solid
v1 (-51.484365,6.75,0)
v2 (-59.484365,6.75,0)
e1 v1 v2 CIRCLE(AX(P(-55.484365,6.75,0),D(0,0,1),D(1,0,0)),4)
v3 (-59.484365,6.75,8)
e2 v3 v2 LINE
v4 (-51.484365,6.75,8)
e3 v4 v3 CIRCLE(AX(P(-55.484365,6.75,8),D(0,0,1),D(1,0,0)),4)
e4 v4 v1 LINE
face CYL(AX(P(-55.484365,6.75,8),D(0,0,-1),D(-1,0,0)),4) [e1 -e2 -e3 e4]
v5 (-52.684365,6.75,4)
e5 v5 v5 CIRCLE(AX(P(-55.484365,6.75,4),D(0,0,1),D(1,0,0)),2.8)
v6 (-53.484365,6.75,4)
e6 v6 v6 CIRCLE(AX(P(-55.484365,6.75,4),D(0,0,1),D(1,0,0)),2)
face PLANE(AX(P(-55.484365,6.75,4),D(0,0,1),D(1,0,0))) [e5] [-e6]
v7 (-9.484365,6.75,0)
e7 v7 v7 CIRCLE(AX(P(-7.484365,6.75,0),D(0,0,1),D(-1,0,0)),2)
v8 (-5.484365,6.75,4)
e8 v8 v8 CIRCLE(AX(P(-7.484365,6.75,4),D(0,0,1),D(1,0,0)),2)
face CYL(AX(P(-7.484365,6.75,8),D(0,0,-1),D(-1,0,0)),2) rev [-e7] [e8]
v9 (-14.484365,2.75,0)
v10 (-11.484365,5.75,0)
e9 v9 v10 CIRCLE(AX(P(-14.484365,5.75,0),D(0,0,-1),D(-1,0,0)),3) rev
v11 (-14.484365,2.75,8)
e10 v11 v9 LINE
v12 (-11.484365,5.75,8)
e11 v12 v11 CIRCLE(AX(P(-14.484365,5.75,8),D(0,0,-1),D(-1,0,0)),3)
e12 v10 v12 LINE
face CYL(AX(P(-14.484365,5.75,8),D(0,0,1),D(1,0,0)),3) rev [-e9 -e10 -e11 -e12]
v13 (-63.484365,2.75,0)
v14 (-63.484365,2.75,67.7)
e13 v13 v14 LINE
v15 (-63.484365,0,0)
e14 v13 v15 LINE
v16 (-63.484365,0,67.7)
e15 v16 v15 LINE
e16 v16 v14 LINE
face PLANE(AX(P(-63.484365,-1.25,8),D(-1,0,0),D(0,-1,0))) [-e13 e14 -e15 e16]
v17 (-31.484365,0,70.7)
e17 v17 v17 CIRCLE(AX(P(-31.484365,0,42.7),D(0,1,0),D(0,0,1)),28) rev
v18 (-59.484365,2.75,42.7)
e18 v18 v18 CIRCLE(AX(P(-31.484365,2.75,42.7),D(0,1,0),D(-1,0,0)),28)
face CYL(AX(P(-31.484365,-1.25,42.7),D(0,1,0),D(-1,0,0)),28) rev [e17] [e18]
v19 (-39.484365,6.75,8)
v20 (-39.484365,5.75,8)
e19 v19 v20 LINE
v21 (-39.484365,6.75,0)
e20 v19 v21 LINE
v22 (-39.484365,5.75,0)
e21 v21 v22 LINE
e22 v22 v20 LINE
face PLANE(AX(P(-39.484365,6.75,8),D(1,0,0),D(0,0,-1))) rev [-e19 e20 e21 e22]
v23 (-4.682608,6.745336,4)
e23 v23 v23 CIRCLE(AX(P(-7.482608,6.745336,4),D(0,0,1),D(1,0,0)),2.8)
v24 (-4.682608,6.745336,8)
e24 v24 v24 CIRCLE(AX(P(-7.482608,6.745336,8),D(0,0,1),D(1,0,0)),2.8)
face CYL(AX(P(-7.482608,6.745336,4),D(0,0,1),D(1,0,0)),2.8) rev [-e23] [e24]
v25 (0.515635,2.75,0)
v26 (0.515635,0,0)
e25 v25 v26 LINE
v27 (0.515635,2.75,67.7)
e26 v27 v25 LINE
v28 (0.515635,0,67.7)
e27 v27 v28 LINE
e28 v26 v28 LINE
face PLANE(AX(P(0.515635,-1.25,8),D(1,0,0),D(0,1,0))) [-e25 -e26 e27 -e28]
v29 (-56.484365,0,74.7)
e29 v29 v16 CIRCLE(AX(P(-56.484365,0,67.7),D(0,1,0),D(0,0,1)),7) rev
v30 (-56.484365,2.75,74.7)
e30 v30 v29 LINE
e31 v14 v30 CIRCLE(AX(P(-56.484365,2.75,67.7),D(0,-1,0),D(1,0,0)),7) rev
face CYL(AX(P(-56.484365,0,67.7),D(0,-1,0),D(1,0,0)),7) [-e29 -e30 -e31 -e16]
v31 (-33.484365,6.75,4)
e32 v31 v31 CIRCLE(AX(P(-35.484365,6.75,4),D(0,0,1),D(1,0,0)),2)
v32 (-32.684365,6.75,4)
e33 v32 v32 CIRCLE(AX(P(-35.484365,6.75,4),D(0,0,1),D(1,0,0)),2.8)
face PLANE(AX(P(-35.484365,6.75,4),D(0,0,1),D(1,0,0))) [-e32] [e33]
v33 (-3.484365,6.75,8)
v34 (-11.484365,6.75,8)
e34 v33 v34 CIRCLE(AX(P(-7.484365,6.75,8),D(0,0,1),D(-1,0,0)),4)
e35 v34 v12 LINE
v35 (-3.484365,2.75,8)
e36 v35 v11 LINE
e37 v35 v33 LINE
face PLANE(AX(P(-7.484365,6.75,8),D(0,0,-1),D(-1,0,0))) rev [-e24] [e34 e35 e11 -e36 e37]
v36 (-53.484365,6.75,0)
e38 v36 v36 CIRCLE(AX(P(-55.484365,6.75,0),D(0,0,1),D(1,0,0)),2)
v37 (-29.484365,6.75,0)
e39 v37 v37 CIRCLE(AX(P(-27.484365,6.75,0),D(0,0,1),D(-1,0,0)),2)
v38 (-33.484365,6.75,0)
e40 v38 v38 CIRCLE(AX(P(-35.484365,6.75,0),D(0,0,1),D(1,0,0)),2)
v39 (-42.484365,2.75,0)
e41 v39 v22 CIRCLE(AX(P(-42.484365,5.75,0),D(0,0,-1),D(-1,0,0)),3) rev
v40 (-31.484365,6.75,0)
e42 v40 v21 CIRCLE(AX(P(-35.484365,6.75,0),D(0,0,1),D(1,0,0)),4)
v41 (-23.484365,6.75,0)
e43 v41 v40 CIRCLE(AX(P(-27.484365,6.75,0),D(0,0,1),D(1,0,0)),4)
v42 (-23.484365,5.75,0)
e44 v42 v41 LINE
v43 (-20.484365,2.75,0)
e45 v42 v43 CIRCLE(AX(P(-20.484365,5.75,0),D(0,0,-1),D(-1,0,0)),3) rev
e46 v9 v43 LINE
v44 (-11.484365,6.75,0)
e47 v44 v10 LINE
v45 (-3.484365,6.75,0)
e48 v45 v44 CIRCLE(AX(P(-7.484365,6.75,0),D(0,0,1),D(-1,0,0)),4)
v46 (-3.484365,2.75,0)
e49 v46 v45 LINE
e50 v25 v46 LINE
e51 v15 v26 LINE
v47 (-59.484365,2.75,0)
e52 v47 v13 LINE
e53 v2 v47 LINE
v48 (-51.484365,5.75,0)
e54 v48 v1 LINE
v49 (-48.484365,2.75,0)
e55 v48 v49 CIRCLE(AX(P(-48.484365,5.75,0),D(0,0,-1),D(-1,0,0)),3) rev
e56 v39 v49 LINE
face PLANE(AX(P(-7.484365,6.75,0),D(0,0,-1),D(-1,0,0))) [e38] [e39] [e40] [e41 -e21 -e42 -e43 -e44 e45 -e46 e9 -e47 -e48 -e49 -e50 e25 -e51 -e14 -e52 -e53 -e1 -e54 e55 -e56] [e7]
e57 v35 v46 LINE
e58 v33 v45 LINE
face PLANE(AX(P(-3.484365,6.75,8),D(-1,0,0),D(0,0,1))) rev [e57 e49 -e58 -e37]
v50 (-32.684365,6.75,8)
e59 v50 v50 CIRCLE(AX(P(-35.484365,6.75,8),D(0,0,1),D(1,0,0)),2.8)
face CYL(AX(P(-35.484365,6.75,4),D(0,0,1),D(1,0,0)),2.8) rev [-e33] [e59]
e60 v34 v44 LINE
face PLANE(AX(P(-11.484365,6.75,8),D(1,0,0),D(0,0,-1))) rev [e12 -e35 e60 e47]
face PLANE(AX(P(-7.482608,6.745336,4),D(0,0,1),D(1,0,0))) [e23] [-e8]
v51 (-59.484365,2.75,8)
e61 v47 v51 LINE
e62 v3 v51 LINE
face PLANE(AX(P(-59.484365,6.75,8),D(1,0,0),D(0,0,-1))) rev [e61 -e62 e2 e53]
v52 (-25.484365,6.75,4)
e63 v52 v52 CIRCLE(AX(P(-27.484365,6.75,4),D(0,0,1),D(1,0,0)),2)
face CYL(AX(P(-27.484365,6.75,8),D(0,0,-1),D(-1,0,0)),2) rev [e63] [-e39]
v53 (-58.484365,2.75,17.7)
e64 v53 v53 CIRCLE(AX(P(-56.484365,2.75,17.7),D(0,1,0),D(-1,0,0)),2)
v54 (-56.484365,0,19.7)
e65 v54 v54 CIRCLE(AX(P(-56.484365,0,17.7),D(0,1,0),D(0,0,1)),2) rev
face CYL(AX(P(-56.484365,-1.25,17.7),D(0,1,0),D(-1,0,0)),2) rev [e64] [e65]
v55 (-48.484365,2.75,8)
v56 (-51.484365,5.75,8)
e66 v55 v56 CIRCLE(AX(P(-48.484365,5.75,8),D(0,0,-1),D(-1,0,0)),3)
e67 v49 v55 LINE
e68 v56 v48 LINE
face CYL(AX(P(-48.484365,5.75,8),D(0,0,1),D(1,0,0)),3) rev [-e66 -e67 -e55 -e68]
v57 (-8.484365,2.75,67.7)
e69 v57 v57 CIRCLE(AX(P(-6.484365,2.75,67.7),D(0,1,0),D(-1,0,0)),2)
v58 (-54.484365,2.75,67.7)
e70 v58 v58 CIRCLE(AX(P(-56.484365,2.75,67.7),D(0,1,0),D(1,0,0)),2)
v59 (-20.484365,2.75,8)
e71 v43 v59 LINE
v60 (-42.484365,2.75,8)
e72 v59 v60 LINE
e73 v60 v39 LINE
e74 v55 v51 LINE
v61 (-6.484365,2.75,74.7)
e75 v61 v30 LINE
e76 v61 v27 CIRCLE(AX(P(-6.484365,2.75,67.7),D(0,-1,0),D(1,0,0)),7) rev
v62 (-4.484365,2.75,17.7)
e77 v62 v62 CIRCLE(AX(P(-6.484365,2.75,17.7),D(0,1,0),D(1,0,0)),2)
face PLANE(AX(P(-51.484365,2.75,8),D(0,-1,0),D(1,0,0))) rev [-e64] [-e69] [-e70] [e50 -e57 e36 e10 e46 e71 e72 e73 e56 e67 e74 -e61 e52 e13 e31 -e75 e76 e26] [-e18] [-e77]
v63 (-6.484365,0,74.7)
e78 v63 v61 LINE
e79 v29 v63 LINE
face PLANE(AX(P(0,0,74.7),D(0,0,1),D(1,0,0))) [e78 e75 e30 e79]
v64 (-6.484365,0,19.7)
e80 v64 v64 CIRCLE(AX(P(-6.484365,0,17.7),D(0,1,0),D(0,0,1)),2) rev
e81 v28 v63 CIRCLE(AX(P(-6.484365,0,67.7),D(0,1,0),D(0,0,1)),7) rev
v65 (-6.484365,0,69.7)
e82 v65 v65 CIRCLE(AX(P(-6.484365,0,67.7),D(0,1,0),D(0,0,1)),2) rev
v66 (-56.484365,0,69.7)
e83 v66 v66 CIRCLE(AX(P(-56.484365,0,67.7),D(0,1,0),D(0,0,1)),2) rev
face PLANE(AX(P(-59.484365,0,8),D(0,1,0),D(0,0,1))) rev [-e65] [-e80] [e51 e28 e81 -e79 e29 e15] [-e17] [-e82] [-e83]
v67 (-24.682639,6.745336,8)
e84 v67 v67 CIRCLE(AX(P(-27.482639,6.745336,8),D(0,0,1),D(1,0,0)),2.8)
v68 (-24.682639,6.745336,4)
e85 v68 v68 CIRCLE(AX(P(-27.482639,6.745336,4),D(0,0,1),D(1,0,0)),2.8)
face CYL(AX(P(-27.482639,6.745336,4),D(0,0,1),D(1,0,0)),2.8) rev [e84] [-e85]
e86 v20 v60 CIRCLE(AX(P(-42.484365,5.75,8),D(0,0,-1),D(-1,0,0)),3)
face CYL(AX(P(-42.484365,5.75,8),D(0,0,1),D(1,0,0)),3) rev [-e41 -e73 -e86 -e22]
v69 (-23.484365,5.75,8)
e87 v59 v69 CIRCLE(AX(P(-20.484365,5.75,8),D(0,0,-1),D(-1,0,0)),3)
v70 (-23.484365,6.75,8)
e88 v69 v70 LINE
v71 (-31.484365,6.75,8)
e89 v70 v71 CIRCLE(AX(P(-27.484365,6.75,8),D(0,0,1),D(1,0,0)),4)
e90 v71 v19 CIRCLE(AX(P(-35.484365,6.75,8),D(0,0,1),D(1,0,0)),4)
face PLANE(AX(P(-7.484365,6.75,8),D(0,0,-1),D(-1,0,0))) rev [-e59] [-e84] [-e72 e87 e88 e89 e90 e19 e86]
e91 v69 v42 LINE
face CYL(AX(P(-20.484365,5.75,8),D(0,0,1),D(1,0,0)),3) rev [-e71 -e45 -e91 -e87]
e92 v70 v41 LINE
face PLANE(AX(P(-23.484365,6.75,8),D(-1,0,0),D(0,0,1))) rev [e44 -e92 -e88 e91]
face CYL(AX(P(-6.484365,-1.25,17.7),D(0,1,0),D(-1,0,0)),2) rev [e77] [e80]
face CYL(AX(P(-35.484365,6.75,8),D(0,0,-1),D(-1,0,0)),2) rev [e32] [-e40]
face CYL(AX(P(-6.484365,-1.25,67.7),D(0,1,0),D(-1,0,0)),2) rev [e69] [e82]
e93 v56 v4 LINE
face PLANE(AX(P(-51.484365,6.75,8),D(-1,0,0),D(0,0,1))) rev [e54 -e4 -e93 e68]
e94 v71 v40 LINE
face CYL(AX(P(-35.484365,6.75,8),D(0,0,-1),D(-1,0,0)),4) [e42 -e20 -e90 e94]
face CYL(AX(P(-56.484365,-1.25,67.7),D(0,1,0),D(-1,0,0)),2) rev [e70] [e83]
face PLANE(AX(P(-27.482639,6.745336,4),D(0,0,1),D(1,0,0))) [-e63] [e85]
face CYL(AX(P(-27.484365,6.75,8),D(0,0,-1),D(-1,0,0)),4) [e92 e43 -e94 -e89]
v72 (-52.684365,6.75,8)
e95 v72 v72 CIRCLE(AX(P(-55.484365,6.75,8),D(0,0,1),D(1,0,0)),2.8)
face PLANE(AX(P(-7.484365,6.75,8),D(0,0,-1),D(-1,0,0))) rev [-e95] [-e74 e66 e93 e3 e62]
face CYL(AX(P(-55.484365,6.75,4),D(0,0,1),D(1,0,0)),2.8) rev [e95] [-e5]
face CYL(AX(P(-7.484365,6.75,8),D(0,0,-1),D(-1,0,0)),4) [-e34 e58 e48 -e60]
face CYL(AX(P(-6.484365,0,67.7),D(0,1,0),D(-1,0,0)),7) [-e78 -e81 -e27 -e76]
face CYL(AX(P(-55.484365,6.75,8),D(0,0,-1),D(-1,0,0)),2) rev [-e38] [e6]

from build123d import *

# Parameters (mm, degrees)
SCHIZZO1_R                        = 2
ESTRUSIONE_ESTRUSIONE1_DEPTH      = 8
SCHIZZO3_W                        = 50
SCHIZZO3_H                        = 2.75
ESTRUSIONE_ESTRUSIONE3_DEPTH      = 55
RACCORDO1_R                       = 4
SCHIZZO4_R                        = 23
TAGLIO_ESTRUSIONE1_DEPTH          = 4
SCHIZZO5_R                        = 2
TAGLIO_ESTRUSIONE2_DEPTH          = 4
RACCORDO2_R                       = 124
SCHIZZO6_R                        = 2.8
TAGLIO_ESTRUSIONE3_DEPTH          = 4
SCHIZZO7_W                        = 64
SCHIZZO7_H                        = 66
SCHIZZO7_R                        = 28
ESTRUSIONE_ESTRUSIONE4_DEPTH      = 4
SCHIZZO8_R                        = 28
TAGLIO_ESTRUSIONE4_DEPTH          = 10
SCHIZZO9_R                        = 2
TAGLIO_ESTRUSIONE5_DEPTH          = 4
RACCORDO3_R                       = 3
RACCORDO4_R                       = 3
RACCORDO5_R                       = 3
SCHIZZO10_W                       = 88.736042833
SCHIZZO10_H                       = 81.022332295
TAGLIO_ESTRUSIONE6_DEPTH          = 1.25
SCHIZZO11_W                       = 58
SCHIZZO11_H                       = 2.75
ESTRUSIONE_ESTRUSIONE5_DEPTH      = 0.7
RACCORDO6_START                   = -1
RACCORDO6_DEPTH                   = 5
RACCORDO8_START                   = -1
RACCORDO8_DEPTH                   = 5
ESTRUSIONE_ESTRUSIONE6_DEPTH      = 4
ESTRUSIONE_ESTRUSIONE6_DEPTH_BACK = 2.75
SCHIZZO12_W                       = 64
SCHIZZO12_H                       = 11.748328584
TAGLIO_ESTRUSIONE7_DEPTH          = 4
SCHIZZO15_W                       = 64
SCHIZZO15_H                       = 14.540634193
TAGLIO_ESTRUSIONE8_DEPTH          = 4


with BuildPart() as part:
    # Schizzo1 → Estrusione-Estrusione1 (new body)
    with BuildSketch(Plane.XY):
        with BuildLine():
            Line((-59.484364928, 0), (-3.484364928, 0))
            Line((-3.484364928, 0), (-3.484364928, 6.75))
            ThreePointArc((-3.484364928, 6.75), (-7.484364928, 10.75), (-11.484364928, 6.75))
            Line((-11.484364928, 6.75), (-11.484364928, 2.75))
            Line((-11.484364928, 2.75), (-23.484364928, 2.75))
            Line((-23.484364928, 2.75), (-23.484364928, 6.75))
            ThreePointArc((-23.484364928, 6.75), (-27.484364928, 10.75), (-31.484364928, 6.75))
            ThreePointArc((-31.484364928, 6.75), (-35.484364928, 10.75), (-39.484364928, 6.75))
            Line((-39.484364928, 6.75), (-39.484364928, 2.75))
            Line((-39.484364928, 2.75), (-51.484364928, 2.75))
            Line((-51.484364928, 2.75), (-51.484364928, 6.75))
            ThreePointArc((-51.484364928, 6.75), (-55.484364928, 10.75), (-59.484364928, 6.75))
            Line((-59.484364928, 6.75), (-59.484364928, 0))
        make_face()
        with Locations((-35.484364928, 6.75)):
            Circle(SCHIZZO1_R, mode=Mode.SUBTRACT)
        with Locations(Location((-27.484364928, 6.75, 0), (0, 0, 180))):
            Circle(SCHIZZO1_R, mode=Mode.SUBTRACT)
        with Locations((-55.484364928, 6.75)):
            Circle(SCHIZZO1_R, mode=Mode.SUBTRACT)
        with Locations(Location((-7.484364928, 6.75, 0), (0, 0, 180))):
            Circle(SCHIZZO1_R, mode=Mode.SUBTRACT)
    extrude(amount=ESTRUSIONE_ESTRUSIONE1_DEPTH)

    # Schizzo3 → Estrusione-Estrusione3 (add)
    with BuildSketch(Plane.XY.offset(8)):
        with Locations((-31.482821648, 1.375)):
            Rectangle(SCHIZZO3_W, SCHIZZO3_H)
    extrude(amount=ESTRUSIONE_ESTRUSIONE3_DEPTH)

    # Raccordo1
    raccordo1_edges = [part.edges().sort_by_distance(p)[0] for p in [
        (-56.482821648, 1.375, 63),
        (-6.482821648, 1.375, 63),
    ]]
    fillet(raccordo1_edges, radius=RACCORDO1_R)

    # Schizzo4 → Taglio-Estrusione1 (cut)
    with BuildSketch(Plane(origin=(0, 2.75, 0), x_dir=(1, 0, 0), z_dir=(0, 1, 0))):
        with Locations(Location((-31.482821648, -35.97589666, 0), (0, 0, 180))):
            Circle(SCHIZZO4_R)
    extrude(amount=-TAGLIO_ESTRUSIONE1_DEPTH, mode=Mode.SUBTRACT)

    # Schizzo5 → Taglio-Estrusione2 (cut)
    with BuildSketch(Plane(origin=(0, 2.75, 0), x_dir=(1, 0, 0), z_dir=(0, 1, 0))):
        with Locations(Location((-51.482821648, -15.97589666, 0), (0, 0, 180))):
            Circle(SCHIZZO5_R)
        with Locations(Location((-51.482821648, -55.97589666, 0), (0, 0, 180))):
            Circle(SCHIZZO5_R)
        with Locations(Location((-11.482821648, -15.97589666, 0), (0, 0, 180))):
            Circle(SCHIZZO5_R)
        with Locations(Location((-11.482821648, -55.97589666, 0), (0, 0, 180))):
            Circle(SCHIZZO5_R)
    extrude(amount=-TAGLIO_ESTRUSIONE2_DEPTH, mode=Mode.SUBTRACT)

    # Raccordo2
    # the kernel refuses this fillet: 124 mm, written as the material it adds along each edge
    with BuildSketch(Plane(origin=(-56.482821648, 2.75, 8), x_dir=(0, 0, 1), z_dir=(0, -1, 0))) as raccordo2_piece_1:
        with BuildLine():
            CenterArc((27.117770399, 124), RACCORDO2_R, 257.367798326, 12.632201674)
            Line((0, 3.00154328), (0, 0))
            Line((0, 0), (27.117770399, 0))
        make_face()
    extrude(amount=2.75)
    with BuildSketch(Plane(origin=(-6.482821648, 0, 8), x_dir=(0, 0, 1), z_dir=(0, 1, 0))) as raccordo2_piece_2:
        with BuildLine():
            CenterArc((27.10399461, 124), RACCORDO2_R, 257.374321421, 12.625678579)
            Line((0, 2.99845672), (0, 0))
            Line((0, 0), (27.10399461, 0))
        make_face()
    extrude(amount=2.75)

    # Schizzo6 → Taglio-Estrusione3 (cut)
    with BuildSketch(Plane.XY.offset(8)):
        with Locations((-55.484364928, 6.75)):
            Circle(SCHIZZO6_R)
        with Locations((-35.484364928, 6.75)):
            Circle(SCHIZZO6_R)
        with Locations((-27.48263887, 6.745335699)):
            Circle(SCHIZZO6_R)
        with Locations((-7.48260826, 6.745335699)):
            Circle(SCHIZZO6_R)
    extrude(amount=-TAGLIO_ESTRUSIONE3_DEPTH, mode=Mode.SUBTRACT)

    # Schizzo7 → Estrusione-Estrusione4 (add)
    with BuildSketch(Plane(origin=(0, 2.75, 0), x_dir=(1, 0, 0), z_dir=(0, 1, 0))):
        with Locations((-31.484364928, -41)):
            Rectangle(SCHIZZO7_W, SCHIZZO7_H)
        with Locations(Location((-31.484364928, -42.7, 0), (0, 0, 180))):
            Circle(SCHIZZO7_R, mode=Mode.SUBTRACT)
    extrude(amount=-ESTRUSIONE_ESTRUSIONE4_DEPTH)

    # Schizzo8 → Taglio-Estrusione4 (cut)
    with BuildSketch(Plane(origin=(0, 2.75, 0), x_dir=(1, 0, 0), z_dir=(0, 1, 0))):
        with Locations(Location((-31.484364928, -42.7, 0), (0, 0, 180))):
            Circle(SCHIZZO8_R)
    extrude(amount=-TAGLIO_ESTRUSIONE4_DEPTH, mode=Mode.SUBTRACT)

    # Schizzo9 → Taglio-Estrusione5 (cut)
    with BuildSketch(Plane(origin=(0, 2.75, 0), x_dir=(1, 0, 0), z_dir=(0, 1, 0))):
        with Locations(Location((-6.484364928, -67.7, 0), (0, 0, 180))):
            Circle(SCHIZZO9_R)
        with Locations((-6.484364928, -17.7)):
            Circle(SCHIZZO9_R)
        with Locations((-56.484364928, -67.7)):
            Circle(SCHIZZO9_R)
        with Locations(Location((-56.484364928, -17.7, 0), (0, 0, 180))):
            Circle(SCHIZZO9_R)
    extrude(amount=-TAGLIO_ESTRUSIONE5_DEPTH, mode=Mode.SUBTRACT)

    # Raccordo3
    # the kernel refuses this fillet: 3 mm, written as the material it adds along each edge
    with BuildSketch(Plane(origin=(-59.484364928, 0, 8), x_dir=(0, -1, 0), z_dir=(1, 0, 0))) as raccordo3_piece_1:
        with BuildLine():
            CenterArc((3, 2.436698586), RACCORDO3_R, 180, 54.314665287)
            Line((0, 2.436698586), (0, 0))
            Line((0, 0), (1.25, 0))
        make_face()
    extrude(amount=56)
    with BuildSketch(Plane(origin=(-3.484364928, 0, 8), x_dir=(1, 0, 0), z_dir=(0, 1, 0)), Plane(origin=(-59.484364928, 2.75, 8), x_dir=(-1, 0, 0), z_dir=(0, -1, 0))) as raccordo3_piece_2:
        with BuildLine():
            CenterArc((RACCORDO3_R, RACCORDO3_R), RACCORDO3_R, 180, 90)
            Line((0, RACCORDO3_R), (0, 0))
            Line((0, 0), (RACCORDO3_R, 0))
        make_face()
    extrude(amount=2.75)
    with BuildSketch(Plane(origin=(-65.576111393, 0, 8), x_dir=(0, -1, 0), z_dir=(1, 0, 0))) as raccordo3_piece_3a_section:
        with BuildLine():
            CenterArc((3, 2.436698586), RACCORDO3_R, 180, 54.314665287)
            Line((0, 2.436698586), (0, 0))
            Line((0, 0), (1.25, 0))
        make_face()
    raccordo3_piece_3a = extrude(amount=62.091746466, mode=Mode.PRIVATE)
    raccordo3_piece_3a = split(raccordo3_piece_3a, bisect_by=Plane(origin=(-63.484364928, 0, 8), z_dir=(1, 0, 0)), keep=Keep.TOP, mode=Mode.PRIVATE)
    raccordo3_piece_3a = split(raccordo3_piece_3a, bisect_by=Plane(origin=(-59.484364928, 0, 8), z_dir=(-1, 0, 0)), keep=Keep.TOP, mode=Mode.PRIVATE)
    with BuildSketch(Plane(origin=(-59.484364928, 2.75, 8), x_dir=(-1, 0, 0), z_dir=(0, -1, 0))) as raccordo3_piece_3b_section:
        with BuildLine():
            CenterArc((RACCORDO3_R, RACCORDO3_R), RACCORDO3_R, 180, 90)
            Line((0, RACCORDO3_R), (0, 0))
            Line((0, 0), (RACCORDO3_R, 0))
        make_face()
    raccordo3_piece_3b = extrude(amount=10.25, mode=Mode.PRIVATE)
    raccordo3_piece_3b = split(raccordo3_piece_3b, bisect_by=Plane(origin=(-59.484364928, 0, 8), z_dir=(0, -1, 0)), keep=Keep.TOP, mode=Mode.PRIVATE)
    raccordo3_piece_3b = split(raccordo3_piece_3b, bisect_by=Plane(origin=(-59.484364928, -1.25, 8), z_dir=(0, 1, 0)), keep=Keep.TOP, mode=Mode.PRIVATE)
    raccordo3_piece_3 = raccordo3_piece_3a & raccordo3_piece_3b
    add(raccordo3_piece_3)
    with BuildSketch(Plane(origin=(-3.484364928, -7.5, 8), x_dir=(1, 0, 0), z_dir=(0, 1, 0))) as raccordo3_piece_4a_section:
        with BuildLine():
            CenterArc((RACCORDO3_R, RACCORDO3_R), RACCORDO3_R, 180, 90)
            Line((0, RACCORDO3_R), (0, 0))
            Line((0, 0), (RACCORDO3_R, 0))
        make_face()
    raccordo3_piece_4a = extrude(amount=10.25, mode=Mode.PRIVATE)
    raccordo3_piece_4a = split(raccordo3_piece_4a, bisect_by=Plane(origin=(-3.484364928, 0, 8), z_dir=(0, -1, 0)), keep=Keep.TOP, mode=Mode.PRIVATE)
    raccordo3_piece_4a = split(raccordo3_piece_4a, bisect_by=Plane(origin=(-3.484364928, -1.25, 8), z_dir=(0, 1, 0)), keep=Keep.TOP, mode=Mode.PRIVATE)
    with BuildSketch(Plane(origin=(-59.484364928, 0, 8), x_dir=(0, -1, 0), z_dir=(1, 0, 0))) as raccordo3_piece_4b_section:
        with BuildLine():
            CenterArc((3, 2.436698586), RACCORDO3_R, 180, 54.314665287)
            Line((0, 2.436698586), (0, 0))
            Line((0, 0), (1.25, 0))
        make_face()
    raccordo3_piece_4b = extrude(amount=62.091746466, mode=Mode.PRIVATE)
    raccordo3_piece_4b = split(raccordo3_piece_4b, bisect_by=Plane(origin=(0.515635072, 0, 8), z_dir=(-1, 0, 0)), keep=Keep.TOP, mode=Mode.PRIVATE)
    raccordo3_piece_4b = split(raccordo3_piece_4b, bisect_by=Plane(origin=(-3.484364928, 0, 8), z_dir=(1, 0, 0)), keep=Keep.TOP, mode=Mode.PRIVATE)
    raccordo3_piece_4 = raccordo3_piece_4a & raccordo3_piece_4b
    add(raccordo3_piece_4)
    # the kernel refuses this fillet: 3 mm, written as the material it takes off along each edge
    with BuildSketch(Plane(origin=(0.515635072, 10.25, 74), x_dir=(-1, 0, 0), z_dir=(0, -1, 0)), Plane(origin=(-63.484364928, 10.25, 74), x_dir=(0, 0, -1), z_dir=(0, -1, 0))) as raccordo3_2_piece_1:
        with BuildLine():
            CenterArc((RACCORDO3_R, RACCORDO3_R), RACCORDO3_R, 180, 90)
            Line((0, RACCORDO3_R), (0, 0))
            Line((0, 0), (RACCORDO3_R, 0))
        make_face()
    extrude(amount=19, mode=Mode.SUBTRACT)

    # Raccordo4
    # the kernel refuses this fillet: 3 mm, written as the material it takes off along each edge
    with BuildSketch(Plane(origin=(-63.484364928, 9.392135624, 8), x_dir=(0.9963405296085128, 0, -0.08547250469845889), z_dir=(0, -1, 0))) as raccordo4_piece_1:
        with BuildLine():
            CenterArc((2.761933602, 2.903549084), RACCORDO4_R, 184.903196278, 70.528779366)
            Line((-0.227087987, 2.64713157), (-0.525990146, 2.621489819))
            Line((-0.525990146, 2.621489819), (-0.298902159, -0.025641751))
            Line((-0.298902159, -0.025641751), (0.025641751, -0.298902159))
            ThreePointArc((0.025641751, -0.298902159), (1.021982281, -0.213429654), (1.931887045, -0.290354908))
            Line((1.931887045, -0.290354908), (2.007345823, 0))
        make_face()
    extrude(amount=17.284271247, mode=Mode.SUBTRACT)
    with BuildSketch(Plane(origin=(0.515635072, 9.392135624, 8), x_dir=(-0.9963405296085196, 0, -0.08547250469837912), z_dir=(0, -1, 0))) as raccordo4_piece_2:
        with BuildLine():
            CenterArc((2.761933602, -2.903549084), RACCORDO4_R, 104.568024357, 70.528779366)
            Line((-0.227087987, -2.64713157), (-0.525990146, -2.621489819))
            Line((-0.525990146, -2.621489819), (-0.298902159, 0.025641751))
            Line((-0.298902159, 0.025641751), (0.025641751, 0.298902159))
            ThreePointArc((0.025641751, 0.298902159), (1.021982281, 0.213429654), (1.931887045, 0.290354908))
            Line((1.931887045, 0.290354908), (2.007345823, 0))
        make_face()
    extrude(amount=17.284271247, mode=Mode.SUBTRACT)

    # Raccordo5
    raccordo5_edges = [part.edges().sort_by_distance(p)[0] for p in [
        (-39.484364928, 2.75, 4),
        (-51.484364928, 2.75, 4),
        (-23.484364928, 2.75, 4),
        (-11.484364928, 2.75, 4),
    ]]
    fillet(raccordo5_edges, radius=RACCORDO5_R)

    # Schizzo10 → Taglio-Estrusione6 (cut)
    with BuildSketch(Plane.XZ.offset(1.25)):
        with Locations((-36.992061707, 40.511166147)):
            Rectangle(SCHIZZO10_W, SCHIZZO10_H)
    extrude(amount=-TAGLIO_ESTRUSIONE6_DEPTH, mode=Mode.SUBTRACT)

    # Schizzo11 → Estrusione-Estrusione5 (add)
    with BuildSketch(Plane.XY.offset(74)):
        with Locations((-31.484364928, 1.375)):
            Rectangle(SCHIZZO11_W, SCHIZZO11_H)
    extrude(amount=ESTRUSIONE_ESTRUSIONE5_DEPTH)

    # Raccordo6: read off the stored shape, not the designer's step
    # Raccordo6 outline → Raccordo6 (cut)
    with BuildSketch(Plane(origin=(0, 0, 0), x_dir=(1, 0, 0), z_dir=(0, 1, 0)).offset(RACCORDO6_START)):
        with BuildLine():
            Line((-60.484364928, -74.7), (-56.484364928, -74.7))
            ThreePointArc((-56.484364928, -74.7), (-61.434112396, -72.649747468), (-63.484364928, -67.7))
            Line((-63.484364928, -67.7), (-63.484364928, -71))
            ThreePointArc((-63.484364928, -71), (-62.605685271, -73.121320344), (-60.484364928, -74))
            Line((-60.484364928, -74), (-60.484364928, -74.7))
        make_face()
    extrude(amount=RACCORDO6_DEPTH, mode=Mode.SUBTRACT)

    # Raccordo8: read off the stored shape, not the designer's step
    # Raccordo8 outline → Raccordo8 (cut)
    with BuildSketch(Plane(origin=(0, 0, 0), x_dir=(1, 0, 0), z_dir=(0, 1, 0)).offset(RACCORDO8_START)):
        with BuildLine():
            ThreePointArc((0.515635072, -67.7), (-1.53461746, -72.649747468), (-6.484364928, -74.7))
            Line((-6.484364928, -74.7), (-2.484364928, -74.7))
            Line((-2.484364928, -74.7), (-2.484364928, -74))
            ThreePointArc((-2.484364928, -74), (-0.363044584, -73.121320344), (0.515635072, -71))
            Line((0.515635072, -71), (0.515635072, -67.7))
        make_face()
    extrude(amount=RACCORDO8_DEPTH, mode=Mode.SUBTRACT)

    # Schizzo12 → Estrusione-Estrusione6 (add, two sides: drawn at the far end of the back side and taken through both)
    with BuildSketch(Plane.XZ.offset(-ESTRUSIONE_ESTRUSIONE6_DEPTH_BACK)):
        with Locations((-31.484364928, 5.874164292)):
            Rectangle(SCHIZZO12_W, SCHIZZO12_H)
    extrude(amount=ESTRUSIONE_ESTRUSIONE6_DEPTH + ESTRUSIONE_ESTRUSIONE6_DEPTH_BACK)

    # Schizzo14 → Taglio-Estrusione7 (cut)
    with BuildSketch(Plane.XZ.offset(4)):
        with BuildLine():
            ThreePointArc((-63.784364872, 15.695561242), (-63.487200964, 13.638374938), (-62.622304057, 11.748328584))
            Line((-62.622304057, 11.748328584), (-31.484364928, 11.748328584))
            Line((-31.484364928, 11.748328584), (-31.484364928, 15.695561242))
            Line((-31.484364928, 15.695561242), (-63.784364872, 15.695561242))
        make_face()
        with BuildLine():
            Line((-31.484364928, 15.695561242), (-31.484364928, 11.748328584))
            Line((-31.484364928, 11.748328584), (-0.346425799, 11.748328584))
            ThreePointArc((-0.346425799, 11.748328584), (0.518471108, 13.638374938), (0.815635017, 15.695561242))
            Line((0.815635017, 15.695561242), (-31.484364928, 15.695561242))
        make_face()
        with BuildLine():
            Line((-31.484364928, 11.748328584), (-31.484364928, 8.4))
            Line((-31.484364928, 8.4), (-30.756456371, 8.4))
            Line((-30.756456371, 8.4), (-6.48436489, 8.4))
            ThreePointArc((-6.48436489, 8.4), (-2.988453083, 9.291521392), (-0.346425799, 11.748328584))
            Line((-0.346425799, 11.748328584), (-31.484364928, 11.748328584))
        make_face()
        with BuildLine():
            ThreePointArc((-62.622304057, 11.748328584), (-59.980276772, 9.291521392), (-56.484364966, 8.4))
            Line((-56.484364966, 8.4), (-32.212273485, 8.4))
            Line((-32.212273485, 8.4), (-31.484364928, 8.4))
            Line((-31.484364928, 8.4), (-31.484364928, 11.748328584))
            Line((-31.484364928, 11.748328584), (-62.622304057, 11.748328584))
        make_face()
    extrude(amount=-TAGLIO_ESTRUSIONE7_DEPTH, mode=Mode.SUBTRACT)

    # Schizzo15 → Taglio-Estrusione8 (cut)
    with BuildSketch(Plane.XZ.offset(4)):
        with Locations((-31.484364928, 7.270317097)):
            Rectangle(SCHIZZO15_W, SCHIZZO15_H)
    extrude(amount=-TAGLIO_ESTRUSIONE8_DEPTH, mode=Mode.SUBTRACT)


solid = part.part
